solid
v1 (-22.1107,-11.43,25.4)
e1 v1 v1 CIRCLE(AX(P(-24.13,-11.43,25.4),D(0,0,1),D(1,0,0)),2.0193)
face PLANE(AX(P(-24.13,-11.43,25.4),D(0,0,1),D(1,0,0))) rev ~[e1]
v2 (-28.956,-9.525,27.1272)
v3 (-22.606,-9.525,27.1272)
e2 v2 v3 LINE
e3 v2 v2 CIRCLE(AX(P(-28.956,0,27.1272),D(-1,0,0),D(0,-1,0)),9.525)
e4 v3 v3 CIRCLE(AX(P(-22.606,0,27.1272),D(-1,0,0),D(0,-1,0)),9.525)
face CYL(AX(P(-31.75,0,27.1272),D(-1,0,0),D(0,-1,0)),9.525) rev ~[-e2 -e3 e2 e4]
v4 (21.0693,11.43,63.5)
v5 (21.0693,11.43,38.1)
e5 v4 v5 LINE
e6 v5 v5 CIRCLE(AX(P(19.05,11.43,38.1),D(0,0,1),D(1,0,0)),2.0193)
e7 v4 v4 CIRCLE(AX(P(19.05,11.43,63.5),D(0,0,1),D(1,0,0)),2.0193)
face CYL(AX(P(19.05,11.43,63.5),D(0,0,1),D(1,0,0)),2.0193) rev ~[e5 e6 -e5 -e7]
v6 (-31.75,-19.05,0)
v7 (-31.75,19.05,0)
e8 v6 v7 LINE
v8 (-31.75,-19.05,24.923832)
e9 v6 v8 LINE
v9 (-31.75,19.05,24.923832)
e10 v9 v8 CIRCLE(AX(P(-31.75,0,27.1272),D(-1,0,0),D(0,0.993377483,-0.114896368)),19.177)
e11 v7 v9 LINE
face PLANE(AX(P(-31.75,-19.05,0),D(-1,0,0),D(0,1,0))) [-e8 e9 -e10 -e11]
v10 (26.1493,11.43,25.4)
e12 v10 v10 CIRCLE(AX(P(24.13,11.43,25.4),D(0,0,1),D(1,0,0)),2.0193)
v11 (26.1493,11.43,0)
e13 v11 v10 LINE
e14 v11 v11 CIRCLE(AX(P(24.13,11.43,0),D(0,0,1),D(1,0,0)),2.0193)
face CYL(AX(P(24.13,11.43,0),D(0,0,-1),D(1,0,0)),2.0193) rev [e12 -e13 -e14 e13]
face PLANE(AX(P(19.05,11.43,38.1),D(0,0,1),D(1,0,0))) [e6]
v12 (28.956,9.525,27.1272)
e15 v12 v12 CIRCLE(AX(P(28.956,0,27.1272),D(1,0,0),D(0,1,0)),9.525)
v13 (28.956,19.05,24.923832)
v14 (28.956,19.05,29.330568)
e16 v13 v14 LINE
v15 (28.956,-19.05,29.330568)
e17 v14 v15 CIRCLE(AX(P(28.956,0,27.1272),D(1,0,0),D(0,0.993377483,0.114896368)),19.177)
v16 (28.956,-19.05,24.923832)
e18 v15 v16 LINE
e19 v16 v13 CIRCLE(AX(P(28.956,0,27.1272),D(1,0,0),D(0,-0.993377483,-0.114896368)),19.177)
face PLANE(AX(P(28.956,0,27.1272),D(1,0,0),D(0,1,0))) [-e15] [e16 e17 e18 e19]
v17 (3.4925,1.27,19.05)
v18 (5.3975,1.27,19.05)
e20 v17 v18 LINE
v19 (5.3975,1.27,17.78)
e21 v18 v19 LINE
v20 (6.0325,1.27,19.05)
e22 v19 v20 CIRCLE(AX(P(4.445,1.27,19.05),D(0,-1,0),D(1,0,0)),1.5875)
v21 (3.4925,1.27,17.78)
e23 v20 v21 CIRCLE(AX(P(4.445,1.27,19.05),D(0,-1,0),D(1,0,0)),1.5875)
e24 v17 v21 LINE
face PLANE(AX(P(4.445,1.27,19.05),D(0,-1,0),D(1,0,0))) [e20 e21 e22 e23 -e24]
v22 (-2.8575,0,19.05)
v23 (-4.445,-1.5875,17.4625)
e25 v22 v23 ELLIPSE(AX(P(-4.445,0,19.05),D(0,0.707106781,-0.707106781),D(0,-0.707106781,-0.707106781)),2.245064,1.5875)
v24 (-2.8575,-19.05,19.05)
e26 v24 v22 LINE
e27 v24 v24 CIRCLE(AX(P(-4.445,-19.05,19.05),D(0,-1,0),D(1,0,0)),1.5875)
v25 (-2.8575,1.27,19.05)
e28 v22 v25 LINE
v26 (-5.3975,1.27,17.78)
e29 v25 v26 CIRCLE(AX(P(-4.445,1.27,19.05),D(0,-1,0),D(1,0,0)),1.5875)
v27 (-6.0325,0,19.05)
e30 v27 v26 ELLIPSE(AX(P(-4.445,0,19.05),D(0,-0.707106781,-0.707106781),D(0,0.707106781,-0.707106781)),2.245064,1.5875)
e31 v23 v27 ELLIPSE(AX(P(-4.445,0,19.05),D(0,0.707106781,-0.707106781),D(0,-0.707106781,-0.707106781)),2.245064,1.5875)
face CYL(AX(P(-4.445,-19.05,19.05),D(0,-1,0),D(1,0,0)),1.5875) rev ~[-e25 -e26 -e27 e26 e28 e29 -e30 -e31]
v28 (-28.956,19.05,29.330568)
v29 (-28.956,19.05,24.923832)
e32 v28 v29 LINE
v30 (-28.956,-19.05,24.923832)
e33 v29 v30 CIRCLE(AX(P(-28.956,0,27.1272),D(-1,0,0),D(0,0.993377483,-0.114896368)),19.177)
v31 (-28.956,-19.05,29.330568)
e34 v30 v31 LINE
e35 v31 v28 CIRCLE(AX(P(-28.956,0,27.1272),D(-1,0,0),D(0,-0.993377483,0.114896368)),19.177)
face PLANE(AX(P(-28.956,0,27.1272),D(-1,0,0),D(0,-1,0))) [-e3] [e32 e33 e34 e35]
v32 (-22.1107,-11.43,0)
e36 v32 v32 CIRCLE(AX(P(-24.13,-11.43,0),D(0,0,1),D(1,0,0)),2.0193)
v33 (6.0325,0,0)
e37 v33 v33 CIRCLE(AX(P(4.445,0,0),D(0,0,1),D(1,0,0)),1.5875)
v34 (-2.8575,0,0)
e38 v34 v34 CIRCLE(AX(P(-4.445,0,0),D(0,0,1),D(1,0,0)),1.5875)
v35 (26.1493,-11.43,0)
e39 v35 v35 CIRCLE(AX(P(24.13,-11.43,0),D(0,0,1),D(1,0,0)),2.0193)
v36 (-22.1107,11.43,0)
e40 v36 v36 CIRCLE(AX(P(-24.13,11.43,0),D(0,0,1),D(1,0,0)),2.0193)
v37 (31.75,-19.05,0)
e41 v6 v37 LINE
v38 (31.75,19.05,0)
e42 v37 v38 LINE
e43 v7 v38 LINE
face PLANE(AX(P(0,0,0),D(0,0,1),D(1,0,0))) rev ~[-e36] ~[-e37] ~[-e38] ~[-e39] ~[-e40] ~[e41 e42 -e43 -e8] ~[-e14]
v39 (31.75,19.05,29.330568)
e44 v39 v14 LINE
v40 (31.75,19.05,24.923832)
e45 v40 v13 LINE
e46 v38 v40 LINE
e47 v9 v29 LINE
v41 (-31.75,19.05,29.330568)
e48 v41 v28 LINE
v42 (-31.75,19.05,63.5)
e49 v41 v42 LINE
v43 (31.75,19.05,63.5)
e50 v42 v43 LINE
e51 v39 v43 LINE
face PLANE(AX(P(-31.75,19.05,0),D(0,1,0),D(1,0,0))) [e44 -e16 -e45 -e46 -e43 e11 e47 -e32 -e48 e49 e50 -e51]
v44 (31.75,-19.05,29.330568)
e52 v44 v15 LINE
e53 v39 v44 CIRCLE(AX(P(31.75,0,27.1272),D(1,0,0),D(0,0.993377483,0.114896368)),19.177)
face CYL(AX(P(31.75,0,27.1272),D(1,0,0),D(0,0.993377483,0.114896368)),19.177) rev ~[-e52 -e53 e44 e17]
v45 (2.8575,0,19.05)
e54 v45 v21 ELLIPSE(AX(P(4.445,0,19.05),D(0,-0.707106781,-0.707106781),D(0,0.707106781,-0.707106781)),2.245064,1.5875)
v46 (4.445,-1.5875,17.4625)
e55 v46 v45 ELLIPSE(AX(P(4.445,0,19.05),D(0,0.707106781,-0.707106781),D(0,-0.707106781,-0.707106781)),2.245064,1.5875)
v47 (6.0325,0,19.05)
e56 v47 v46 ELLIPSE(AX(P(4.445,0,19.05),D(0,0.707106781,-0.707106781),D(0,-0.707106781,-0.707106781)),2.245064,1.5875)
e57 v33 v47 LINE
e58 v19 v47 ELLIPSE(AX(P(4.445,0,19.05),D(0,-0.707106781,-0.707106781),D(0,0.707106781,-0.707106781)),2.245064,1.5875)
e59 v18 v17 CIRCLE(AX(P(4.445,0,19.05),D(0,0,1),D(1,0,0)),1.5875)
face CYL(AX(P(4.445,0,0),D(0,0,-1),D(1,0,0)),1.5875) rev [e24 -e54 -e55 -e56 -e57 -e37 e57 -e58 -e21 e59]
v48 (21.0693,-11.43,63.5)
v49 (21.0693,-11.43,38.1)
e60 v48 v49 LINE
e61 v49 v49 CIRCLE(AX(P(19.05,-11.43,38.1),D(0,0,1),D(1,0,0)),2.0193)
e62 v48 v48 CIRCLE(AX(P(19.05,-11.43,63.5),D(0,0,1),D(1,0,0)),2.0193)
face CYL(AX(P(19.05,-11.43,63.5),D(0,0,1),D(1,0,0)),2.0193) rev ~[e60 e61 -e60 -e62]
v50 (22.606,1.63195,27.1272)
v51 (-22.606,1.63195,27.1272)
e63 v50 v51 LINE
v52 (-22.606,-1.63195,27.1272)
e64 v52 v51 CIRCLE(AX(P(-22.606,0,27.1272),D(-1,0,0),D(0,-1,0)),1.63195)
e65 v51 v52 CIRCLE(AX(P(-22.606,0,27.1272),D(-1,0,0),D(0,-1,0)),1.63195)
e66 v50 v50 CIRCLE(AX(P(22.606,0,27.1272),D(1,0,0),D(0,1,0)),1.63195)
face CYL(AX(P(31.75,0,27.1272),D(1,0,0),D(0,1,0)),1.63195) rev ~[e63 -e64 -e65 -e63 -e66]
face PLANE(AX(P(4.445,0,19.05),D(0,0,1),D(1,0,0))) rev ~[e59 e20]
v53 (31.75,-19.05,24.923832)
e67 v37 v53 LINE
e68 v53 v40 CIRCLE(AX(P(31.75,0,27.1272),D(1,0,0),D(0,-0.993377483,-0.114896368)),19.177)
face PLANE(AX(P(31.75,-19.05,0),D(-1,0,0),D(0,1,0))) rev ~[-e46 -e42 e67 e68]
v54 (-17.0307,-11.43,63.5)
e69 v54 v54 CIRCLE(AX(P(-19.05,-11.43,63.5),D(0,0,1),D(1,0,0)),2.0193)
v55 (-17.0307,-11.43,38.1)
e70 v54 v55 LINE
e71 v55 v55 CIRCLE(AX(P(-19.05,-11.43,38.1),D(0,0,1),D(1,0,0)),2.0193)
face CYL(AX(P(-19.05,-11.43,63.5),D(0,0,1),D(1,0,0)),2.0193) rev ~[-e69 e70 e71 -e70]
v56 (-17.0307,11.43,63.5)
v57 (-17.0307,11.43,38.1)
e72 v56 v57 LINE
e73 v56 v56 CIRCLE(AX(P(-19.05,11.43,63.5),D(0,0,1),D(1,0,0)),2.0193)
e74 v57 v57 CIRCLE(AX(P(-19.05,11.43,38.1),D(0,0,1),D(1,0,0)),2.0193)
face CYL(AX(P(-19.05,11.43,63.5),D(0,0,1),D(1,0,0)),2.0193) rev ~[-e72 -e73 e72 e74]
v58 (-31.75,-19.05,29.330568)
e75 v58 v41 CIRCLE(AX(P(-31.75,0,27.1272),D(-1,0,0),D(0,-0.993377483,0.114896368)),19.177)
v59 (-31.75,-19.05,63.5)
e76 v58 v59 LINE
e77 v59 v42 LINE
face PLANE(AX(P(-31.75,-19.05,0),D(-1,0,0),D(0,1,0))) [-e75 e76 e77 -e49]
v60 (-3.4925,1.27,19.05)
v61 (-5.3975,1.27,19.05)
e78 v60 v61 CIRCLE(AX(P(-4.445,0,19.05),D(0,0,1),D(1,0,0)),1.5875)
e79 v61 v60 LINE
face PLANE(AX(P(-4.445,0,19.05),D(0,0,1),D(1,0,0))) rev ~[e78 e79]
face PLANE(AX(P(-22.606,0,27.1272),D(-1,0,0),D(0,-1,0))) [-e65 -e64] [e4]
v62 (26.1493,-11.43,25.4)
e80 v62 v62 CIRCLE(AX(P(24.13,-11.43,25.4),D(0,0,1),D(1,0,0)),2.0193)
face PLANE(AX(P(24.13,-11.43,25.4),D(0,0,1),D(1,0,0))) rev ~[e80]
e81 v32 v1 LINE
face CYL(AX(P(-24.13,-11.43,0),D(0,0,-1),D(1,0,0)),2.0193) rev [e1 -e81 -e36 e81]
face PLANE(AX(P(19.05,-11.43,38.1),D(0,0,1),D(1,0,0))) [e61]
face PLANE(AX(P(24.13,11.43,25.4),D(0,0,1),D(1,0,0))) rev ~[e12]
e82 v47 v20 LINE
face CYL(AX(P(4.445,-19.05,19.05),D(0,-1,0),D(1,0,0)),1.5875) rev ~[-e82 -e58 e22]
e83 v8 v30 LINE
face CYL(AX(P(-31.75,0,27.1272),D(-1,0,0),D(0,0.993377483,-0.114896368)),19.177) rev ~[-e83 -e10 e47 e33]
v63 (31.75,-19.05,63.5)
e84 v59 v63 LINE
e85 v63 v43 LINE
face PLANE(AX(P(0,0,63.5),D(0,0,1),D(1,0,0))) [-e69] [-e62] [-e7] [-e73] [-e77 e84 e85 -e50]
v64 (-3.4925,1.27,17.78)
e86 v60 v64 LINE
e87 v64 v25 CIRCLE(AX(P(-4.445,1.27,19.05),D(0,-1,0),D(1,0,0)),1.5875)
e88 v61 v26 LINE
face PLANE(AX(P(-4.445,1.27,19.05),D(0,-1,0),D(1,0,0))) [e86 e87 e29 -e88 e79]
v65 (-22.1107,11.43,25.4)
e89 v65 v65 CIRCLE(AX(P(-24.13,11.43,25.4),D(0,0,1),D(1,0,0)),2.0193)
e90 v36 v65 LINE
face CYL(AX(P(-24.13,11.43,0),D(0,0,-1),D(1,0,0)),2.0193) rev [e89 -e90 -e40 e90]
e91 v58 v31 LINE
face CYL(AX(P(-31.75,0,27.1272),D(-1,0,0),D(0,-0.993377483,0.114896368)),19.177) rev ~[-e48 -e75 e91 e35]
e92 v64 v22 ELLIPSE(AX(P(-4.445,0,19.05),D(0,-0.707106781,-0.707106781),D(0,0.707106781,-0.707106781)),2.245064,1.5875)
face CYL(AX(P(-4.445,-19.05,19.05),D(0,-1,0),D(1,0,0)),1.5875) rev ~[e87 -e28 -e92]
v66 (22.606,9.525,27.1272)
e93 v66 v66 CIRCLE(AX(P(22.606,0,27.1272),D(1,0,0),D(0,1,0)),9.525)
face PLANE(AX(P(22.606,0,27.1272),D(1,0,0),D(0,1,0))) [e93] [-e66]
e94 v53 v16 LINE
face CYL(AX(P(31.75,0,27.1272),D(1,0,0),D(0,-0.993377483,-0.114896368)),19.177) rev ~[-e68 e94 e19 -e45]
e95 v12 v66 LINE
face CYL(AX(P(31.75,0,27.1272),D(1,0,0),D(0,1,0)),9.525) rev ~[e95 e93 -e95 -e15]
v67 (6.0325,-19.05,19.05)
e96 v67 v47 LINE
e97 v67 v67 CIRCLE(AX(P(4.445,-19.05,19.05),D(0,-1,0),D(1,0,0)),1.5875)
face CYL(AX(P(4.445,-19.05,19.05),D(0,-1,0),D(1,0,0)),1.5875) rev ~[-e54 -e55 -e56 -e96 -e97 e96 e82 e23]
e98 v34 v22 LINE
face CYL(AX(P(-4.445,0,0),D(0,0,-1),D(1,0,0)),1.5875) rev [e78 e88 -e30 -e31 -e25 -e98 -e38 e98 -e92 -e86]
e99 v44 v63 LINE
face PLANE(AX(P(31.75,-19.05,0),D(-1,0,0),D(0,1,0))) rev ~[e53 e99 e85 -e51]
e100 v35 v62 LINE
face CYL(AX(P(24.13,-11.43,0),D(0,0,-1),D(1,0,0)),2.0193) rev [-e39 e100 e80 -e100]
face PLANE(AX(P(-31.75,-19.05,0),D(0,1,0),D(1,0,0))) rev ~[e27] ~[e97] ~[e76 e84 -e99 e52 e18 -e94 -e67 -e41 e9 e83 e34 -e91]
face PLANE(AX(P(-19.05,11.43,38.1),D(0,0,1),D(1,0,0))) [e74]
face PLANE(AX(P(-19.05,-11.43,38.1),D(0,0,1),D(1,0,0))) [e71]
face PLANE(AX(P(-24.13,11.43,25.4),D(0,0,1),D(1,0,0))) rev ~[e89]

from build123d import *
from build123d import SkipClean  # not in build123d's __all__

# Parameters (mm, degrees)
F0_W      = 63.5
F0_H      = 38.1
F0_R      = 2.0193
F1_DEPTH  = 63.5
F2_DEPTH  = 25.4
F3_R      = 2.0193
F4_DEPTH  = 25.4
F5_R      = 1.5875
F6_DEPTH  = 19.05
F7_R      = 1.5875
F8_DEPTH  = 20.32
F9_R      = 1.63195
F10_DEPTH = 63.501
F9_R_2    = 9.525
F11_DEPTH = 9.144
F12_DEPTH = 2.794
F13_R     = 9.525
F13_R_2   = 1.63195
F14_DEPTH = 9.144
F15_DEPTH = 2.794


with BuildPart() as f1:
    # F0 (on Top) → F1 (new body)
    with BuildSketch(Plane.XY):
        Rectangle(F0_W, F0_H)
        with Locations((-24.13, -11.43)):
            Circle(F0_R, mode=Mode.SUBTRACT)
        with Locations((24.13, -11.43)):
            Circle(F0_R, mode=Mode.SUBTRACT)
        with Locations((-24.13, 11.43)):
            Circle(F0_R, mode=Mode.SUBTRACT)
        with Locations((24.13, 11.43)):
            Circle(F0_R, mode=Mode.SUBTRACT)
        with Locations((-24.13, 11.43)):
            Circle(F0_R)
        with Locations((24.13, 11.43)):
            Circle(F0_R)
        with Locations((24.13, -11.43)):
            Circle(F0_R)
        with Locations((-24.13, -11.43)):
            Circle(F0_R)
    extrude(amount=F1_DEPTH)

    # F0 (on Top) → F2 (cut)
    with BuildSketch(Plane.XY):
        with Locations((24.13, 11.43)):
            Circle(F0_R)
        with Locations((24.13, -11.43)):
            Circle(F0_R)
        with Locations((-24.13, 11.43)):
            Circle(F0_R)
        with Locations((-24.13, -11.43)):
            Circle(F0_R)
    extrude(amount=F2_DEPTH, mode=Mode.SUBTRACT)

    # F3 (on face) → F4 (cut)
    with BuildSketch(Plane.XY.offset(63.5)):
        with Locations((-19.05, 11.43)):
            Circle(F3_R)
        with Locations((-19.05, -11.43)):
            Circle(F3_R)
        with Locations((19.05, 11.43)):
            Circle(F3_R)
        with Locations((19.05, -11.43)):
            Circle(F3_R)
    extrude(amount=-F4_DEPTH, mode=Mode.SUBTRACT)

    # F5 (on face) → F6 (cut)
    with BuildSketch(Plane.XY):
        with Locations((-4.445, 0)):
            Circle(F5_R)
        with Locations((4.445, 0)):
            Circle(F5_R)
    extrude(amount=F6_DEPTH, mode=Mode.SUBTRACT)

    # F7 (on face) → F8 (cut)
    with BuildSketch(Plane.XZ.offset(19.05)):
        with Locations((-4.445, 19.05)):
            Circle(F7_R)
        with Locations((4.445, 19.05)):
            Circle(F7_R)
    with SkipClean():  # cleaning this boolean's faces spoils the solid; the shape is the same uncleaned
        extrude(amount=-F8_DEPTH, mode=Mode.SUBTRACT)

    # F9 (on face) → F10 (cut, through all)
    with BuildSketch(Plane.YZ.offset(31.75)):
        with Locations((0, 27.1272)):
            Circle(F9_R)
    with SkipClean():  # cleaning this boolean's faces spoils the solid; the shape is the same uncleaned
        extrude(amount=-F10_DEPTH, mode=Mode.SUBTRACT)

    # F9 (on face) → F11 (cut)
    with BuildSketch(Plane.YZ.offset(31.75)):
        with Locations((0, 27.1272)):
            Circle(F9_R_2)
        with Locations((0, 27.1272)):
            Circle(F9_R, mode=Mode.SUBTRACT)
    with SkipClean():  # cleaning this boolean's faces spoils the solid; the shape is the same uncleaned
        extrude(amount=-F11_DEPTH, mode=Mode.SUBTRACT)

    # F9 (on face) → F12 (cut)
    with BuildSketch(Plane.YZ.offset(31.75)):
        with BuildLine():
            Line((19.05, 24.9238323502), (19.05, 29.3305676498))
            ThreePointArc((19.05, 29.3305676498), (0, 46.3042), (-19.05, 29.3305676498))
            Line((-19.05, 29.3305676498), (-19.05, 24.9238323502))
            ThreePointArc((-19.05, 24.9238323502), (0, 7.9502), (19.05, 24.9238323502))
        make_face()
        with Locations((0, 27.1272)):
            Circle(F9_R_2, mode=Mode.SUBTRACT)
    with SkipClean():  # cleaning this boolean's faces spoils the solid; the shape is the same uncleaned
        extrude(amount=-F12_DEPTH, mode=Mode.SUBTRACT)

    # F13 (on face) → F14 (cut)
    with BuildSketch(Plane(origin=(-31.75, 0, 0), x_dir=(0, -1, 0), z_dir=(-1, 0, 0))):
        with Locations((0, 27.1272)):
            Circle(F13_R)
        with Locations((0, 27.1272)):
            Circle(F13_R_2, mode=Mode.SUBTRACT)
    with SkipClean():  # cleaning this boolean's faces spoils the solid; the shape is the same uncleaned
        extrude(amount=-F14_DEPTH, mode=Mode.SUBTRACT)

    # F13 (on face) → F15 (cut)
    with BuildSketch(Plane(origin=(-31.75, 0, 0), x_dir=(0, -1, 0), z_dir=(-1, 0, 0))):
        with BuildLine():
            Line((19.05, 24.9238323502), (19.05, 29.3305676498))
            ThreePointArc((19.05, 29.3305676498), (0, 46.3042), (-19.05, 29.3305676498))
            Line((-19.05, 29.3305676498), (-19.05, 24.9238323502))
            ThreePointArc((-19.05, 24.9238323502), (0, 7.9502), (19.05, 24.9238323502))
        make_face()
        with Locations((0, 27.1272)):
            Circle(F13_R, mode=Mode.SUBTRACT)
    with SkipClean():  # cleaning this boolean's faces spoils the solid; the shape is the same uncleaned
        extrude(amount=-F15_DEPTH, mode=Mode.SUBTRACT)


solid = f1.part
